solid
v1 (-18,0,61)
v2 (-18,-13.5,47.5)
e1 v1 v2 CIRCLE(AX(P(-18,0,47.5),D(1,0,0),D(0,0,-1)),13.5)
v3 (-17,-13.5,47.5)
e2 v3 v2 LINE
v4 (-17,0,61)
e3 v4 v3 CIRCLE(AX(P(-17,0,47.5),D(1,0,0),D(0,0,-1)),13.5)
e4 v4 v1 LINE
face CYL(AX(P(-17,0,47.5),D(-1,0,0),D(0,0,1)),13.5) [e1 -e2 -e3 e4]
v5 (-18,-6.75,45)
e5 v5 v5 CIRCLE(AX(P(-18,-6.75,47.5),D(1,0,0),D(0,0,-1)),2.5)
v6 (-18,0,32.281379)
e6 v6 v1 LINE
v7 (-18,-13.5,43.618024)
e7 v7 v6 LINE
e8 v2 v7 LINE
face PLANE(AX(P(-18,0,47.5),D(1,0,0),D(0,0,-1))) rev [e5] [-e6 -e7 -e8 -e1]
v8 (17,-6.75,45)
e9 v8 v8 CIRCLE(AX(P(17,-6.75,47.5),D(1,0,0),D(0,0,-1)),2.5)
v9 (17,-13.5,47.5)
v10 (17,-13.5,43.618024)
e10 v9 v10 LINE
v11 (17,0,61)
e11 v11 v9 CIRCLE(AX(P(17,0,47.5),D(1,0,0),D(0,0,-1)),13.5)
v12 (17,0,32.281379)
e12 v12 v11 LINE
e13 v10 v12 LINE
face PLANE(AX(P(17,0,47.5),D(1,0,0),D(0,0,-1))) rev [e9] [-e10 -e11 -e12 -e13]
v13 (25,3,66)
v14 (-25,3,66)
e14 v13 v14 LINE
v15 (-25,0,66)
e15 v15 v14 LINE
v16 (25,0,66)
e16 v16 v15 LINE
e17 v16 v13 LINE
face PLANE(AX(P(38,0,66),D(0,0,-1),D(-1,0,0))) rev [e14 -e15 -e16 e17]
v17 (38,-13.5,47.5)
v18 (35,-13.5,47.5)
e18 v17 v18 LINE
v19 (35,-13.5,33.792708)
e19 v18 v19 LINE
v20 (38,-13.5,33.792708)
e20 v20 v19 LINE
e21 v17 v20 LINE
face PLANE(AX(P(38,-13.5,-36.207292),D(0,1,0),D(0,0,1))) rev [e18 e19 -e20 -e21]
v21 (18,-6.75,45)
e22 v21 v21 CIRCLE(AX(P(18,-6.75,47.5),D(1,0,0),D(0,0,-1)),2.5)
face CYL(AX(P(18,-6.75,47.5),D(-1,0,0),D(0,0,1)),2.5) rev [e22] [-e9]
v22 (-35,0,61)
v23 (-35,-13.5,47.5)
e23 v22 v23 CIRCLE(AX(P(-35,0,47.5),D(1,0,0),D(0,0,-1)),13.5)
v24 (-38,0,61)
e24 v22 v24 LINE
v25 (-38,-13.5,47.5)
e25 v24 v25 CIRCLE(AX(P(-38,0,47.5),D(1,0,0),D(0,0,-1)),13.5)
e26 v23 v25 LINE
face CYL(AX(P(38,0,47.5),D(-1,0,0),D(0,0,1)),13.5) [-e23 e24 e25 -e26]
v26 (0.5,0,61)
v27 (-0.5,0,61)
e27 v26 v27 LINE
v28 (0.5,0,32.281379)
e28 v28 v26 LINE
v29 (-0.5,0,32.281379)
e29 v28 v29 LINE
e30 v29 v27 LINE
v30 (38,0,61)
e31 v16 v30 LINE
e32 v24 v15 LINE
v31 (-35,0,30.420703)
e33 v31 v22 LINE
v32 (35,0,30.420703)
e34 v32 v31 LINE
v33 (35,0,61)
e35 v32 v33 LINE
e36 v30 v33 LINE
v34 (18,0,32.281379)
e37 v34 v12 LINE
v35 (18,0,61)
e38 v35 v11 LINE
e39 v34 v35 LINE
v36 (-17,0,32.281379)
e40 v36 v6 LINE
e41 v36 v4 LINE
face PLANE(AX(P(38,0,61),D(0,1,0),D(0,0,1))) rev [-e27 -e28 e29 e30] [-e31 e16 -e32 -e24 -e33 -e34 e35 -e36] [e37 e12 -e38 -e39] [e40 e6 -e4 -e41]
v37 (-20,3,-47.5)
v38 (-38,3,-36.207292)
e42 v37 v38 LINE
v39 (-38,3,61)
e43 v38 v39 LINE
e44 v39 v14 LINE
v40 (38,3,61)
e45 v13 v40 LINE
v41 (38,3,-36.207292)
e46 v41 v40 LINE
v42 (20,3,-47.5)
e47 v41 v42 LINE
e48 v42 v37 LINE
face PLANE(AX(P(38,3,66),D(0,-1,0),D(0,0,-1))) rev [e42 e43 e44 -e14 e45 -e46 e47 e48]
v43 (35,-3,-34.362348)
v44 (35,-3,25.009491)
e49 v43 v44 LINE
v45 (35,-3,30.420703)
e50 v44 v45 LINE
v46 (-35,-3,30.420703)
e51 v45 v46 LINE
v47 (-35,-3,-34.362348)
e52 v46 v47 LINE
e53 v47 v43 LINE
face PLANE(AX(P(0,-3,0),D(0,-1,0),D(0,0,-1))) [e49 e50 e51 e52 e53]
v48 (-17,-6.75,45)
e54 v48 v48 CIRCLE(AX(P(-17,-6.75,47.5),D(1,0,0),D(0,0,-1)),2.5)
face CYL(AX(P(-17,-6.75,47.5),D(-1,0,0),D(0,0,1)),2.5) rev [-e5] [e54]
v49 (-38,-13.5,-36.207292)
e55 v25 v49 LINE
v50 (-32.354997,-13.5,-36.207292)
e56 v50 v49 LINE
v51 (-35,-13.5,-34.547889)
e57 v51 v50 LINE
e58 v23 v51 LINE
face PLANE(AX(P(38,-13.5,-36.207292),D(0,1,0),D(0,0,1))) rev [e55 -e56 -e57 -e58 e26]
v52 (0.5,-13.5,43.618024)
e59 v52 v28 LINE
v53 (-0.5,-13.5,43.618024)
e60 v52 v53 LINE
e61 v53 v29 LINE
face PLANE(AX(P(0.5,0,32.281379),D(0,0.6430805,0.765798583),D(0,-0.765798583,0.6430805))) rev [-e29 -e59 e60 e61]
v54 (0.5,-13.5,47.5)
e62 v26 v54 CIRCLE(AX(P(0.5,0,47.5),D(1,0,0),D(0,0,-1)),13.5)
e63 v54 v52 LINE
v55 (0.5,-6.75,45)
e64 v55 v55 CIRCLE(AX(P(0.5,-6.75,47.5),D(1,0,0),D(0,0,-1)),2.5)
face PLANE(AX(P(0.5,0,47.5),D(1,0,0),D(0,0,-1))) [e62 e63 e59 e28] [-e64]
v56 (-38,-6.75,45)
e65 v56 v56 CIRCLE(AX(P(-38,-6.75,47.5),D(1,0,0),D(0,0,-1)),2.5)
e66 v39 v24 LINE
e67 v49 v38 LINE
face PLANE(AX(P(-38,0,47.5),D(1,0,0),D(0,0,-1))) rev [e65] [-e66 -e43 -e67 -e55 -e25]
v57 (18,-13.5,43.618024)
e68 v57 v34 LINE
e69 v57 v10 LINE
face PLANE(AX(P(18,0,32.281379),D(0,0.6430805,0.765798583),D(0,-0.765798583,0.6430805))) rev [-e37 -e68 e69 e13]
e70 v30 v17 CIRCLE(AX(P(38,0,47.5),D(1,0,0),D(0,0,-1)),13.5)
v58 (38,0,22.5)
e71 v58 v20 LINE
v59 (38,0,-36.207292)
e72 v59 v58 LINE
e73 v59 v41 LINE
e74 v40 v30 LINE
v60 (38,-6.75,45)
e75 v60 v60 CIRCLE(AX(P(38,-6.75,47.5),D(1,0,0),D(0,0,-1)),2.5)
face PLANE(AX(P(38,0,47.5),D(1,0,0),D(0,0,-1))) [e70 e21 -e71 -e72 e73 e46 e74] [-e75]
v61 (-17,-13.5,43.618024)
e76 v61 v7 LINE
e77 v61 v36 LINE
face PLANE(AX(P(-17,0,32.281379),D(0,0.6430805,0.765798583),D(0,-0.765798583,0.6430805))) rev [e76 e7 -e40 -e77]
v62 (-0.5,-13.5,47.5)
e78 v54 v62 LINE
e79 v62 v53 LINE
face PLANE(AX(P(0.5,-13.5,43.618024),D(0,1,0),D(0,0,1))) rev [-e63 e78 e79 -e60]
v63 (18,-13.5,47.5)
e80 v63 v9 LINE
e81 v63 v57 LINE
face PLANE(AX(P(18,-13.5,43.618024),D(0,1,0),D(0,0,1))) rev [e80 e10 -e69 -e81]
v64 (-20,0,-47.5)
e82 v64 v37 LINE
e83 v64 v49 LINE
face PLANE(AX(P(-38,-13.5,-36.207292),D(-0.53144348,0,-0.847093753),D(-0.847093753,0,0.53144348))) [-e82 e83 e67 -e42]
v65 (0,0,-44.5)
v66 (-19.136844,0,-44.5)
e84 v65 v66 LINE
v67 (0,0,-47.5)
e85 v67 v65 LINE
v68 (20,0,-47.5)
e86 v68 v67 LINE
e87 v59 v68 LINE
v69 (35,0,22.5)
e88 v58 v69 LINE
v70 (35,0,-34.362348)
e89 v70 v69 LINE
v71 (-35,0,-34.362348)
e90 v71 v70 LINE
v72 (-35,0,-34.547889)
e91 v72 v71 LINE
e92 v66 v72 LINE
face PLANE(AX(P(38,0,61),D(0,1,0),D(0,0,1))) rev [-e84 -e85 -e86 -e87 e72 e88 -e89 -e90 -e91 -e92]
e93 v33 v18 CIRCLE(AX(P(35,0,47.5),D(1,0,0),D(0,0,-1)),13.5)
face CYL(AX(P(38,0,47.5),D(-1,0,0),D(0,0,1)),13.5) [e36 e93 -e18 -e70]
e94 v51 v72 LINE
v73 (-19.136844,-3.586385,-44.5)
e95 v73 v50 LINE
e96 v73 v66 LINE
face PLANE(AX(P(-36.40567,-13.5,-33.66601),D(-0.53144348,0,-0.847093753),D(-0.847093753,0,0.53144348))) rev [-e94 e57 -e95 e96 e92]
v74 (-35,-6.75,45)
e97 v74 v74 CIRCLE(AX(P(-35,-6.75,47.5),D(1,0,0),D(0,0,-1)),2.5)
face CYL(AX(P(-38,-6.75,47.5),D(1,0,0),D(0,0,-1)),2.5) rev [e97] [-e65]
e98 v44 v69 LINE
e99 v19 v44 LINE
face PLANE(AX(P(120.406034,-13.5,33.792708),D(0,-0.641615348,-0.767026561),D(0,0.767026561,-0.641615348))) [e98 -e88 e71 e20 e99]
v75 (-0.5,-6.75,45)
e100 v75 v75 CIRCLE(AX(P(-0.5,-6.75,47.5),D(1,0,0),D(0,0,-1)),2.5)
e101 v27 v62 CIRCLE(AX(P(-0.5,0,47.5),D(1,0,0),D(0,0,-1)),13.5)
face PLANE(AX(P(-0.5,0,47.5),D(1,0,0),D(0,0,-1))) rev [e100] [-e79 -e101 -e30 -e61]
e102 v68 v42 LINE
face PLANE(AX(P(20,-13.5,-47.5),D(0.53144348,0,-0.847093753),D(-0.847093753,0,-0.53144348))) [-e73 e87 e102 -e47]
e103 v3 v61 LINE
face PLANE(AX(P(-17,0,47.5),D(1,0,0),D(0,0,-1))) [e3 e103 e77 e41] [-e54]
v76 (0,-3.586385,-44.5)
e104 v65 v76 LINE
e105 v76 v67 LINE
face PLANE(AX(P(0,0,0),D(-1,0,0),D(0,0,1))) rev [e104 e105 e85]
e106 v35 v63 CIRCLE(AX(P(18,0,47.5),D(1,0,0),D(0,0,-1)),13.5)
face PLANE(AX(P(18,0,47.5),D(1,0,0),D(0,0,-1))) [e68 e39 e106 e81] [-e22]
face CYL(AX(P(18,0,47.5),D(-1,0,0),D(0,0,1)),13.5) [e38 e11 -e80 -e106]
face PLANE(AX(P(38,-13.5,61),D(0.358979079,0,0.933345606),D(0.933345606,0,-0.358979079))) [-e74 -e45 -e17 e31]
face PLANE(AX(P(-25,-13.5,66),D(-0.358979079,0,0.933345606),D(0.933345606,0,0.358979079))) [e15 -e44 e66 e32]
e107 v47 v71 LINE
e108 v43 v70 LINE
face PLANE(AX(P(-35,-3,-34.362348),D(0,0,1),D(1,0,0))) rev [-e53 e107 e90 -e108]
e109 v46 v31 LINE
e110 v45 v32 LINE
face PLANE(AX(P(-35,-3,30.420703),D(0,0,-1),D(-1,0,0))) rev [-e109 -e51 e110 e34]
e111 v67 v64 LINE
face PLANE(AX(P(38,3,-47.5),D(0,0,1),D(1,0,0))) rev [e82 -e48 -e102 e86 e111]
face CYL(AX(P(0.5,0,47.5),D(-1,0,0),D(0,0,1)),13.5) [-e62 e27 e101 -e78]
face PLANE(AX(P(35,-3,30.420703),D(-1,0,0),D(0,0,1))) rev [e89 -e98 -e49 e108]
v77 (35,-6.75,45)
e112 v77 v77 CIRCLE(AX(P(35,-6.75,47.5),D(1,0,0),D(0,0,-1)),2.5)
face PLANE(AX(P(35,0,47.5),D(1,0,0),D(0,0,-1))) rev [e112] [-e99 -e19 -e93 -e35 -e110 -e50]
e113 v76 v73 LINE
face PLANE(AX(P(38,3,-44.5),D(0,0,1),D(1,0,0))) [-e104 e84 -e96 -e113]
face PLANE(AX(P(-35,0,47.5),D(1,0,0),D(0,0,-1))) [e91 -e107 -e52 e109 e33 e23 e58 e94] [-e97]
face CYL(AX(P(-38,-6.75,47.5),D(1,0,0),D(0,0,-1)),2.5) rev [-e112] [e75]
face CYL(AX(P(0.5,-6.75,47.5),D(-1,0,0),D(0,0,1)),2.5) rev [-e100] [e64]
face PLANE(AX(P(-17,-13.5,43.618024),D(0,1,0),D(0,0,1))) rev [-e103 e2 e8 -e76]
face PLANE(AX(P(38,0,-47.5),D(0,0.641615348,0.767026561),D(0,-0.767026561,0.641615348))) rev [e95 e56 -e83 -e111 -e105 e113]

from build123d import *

# Parameters (mm, degrees)
BOSS_EXTRUDE1_DEPTH     = 38
CUT_EXTRUDE1_DEPTH      = 78.345006303
CUT_EXTRUDE1_DEPTH_BACK = 78.345006303
SKETCH2_OUTSIDE_W       = 105.518
SKETCH2_OUTSIDE_H       = 143.018
SHELL1_START            = -13.5
SHELL1_DEPTH            = 13.5
CUT_EXTRUDE2_DEPTH      = 78.345006303
CUT_EXTRUDE2_DEPTH_BACK = 78.345006303
SKETCH3_R               = 2.5
CUT_EXTRUDE3_DEPTH      = 38
SKETCH5_R               = 2.5
BOSS_EXTRUDE2_DEPTH     = 0.5
LPATTERN1_COUNT         = 3
LPATTERN1_PITCH         = 17.5
SKETCH7_W               = 70
SKETCH7_H               = 64.783051232
BOSS_EXTRUDE3_DEPTH     = 3


# Read off the part's stored shape, not the designer's step: Shell1
with BuildPart() as part:
    # Sketch1 → Boss-Extrude1 (new, symmetric)
    with BuildSketch(Plane(origin=(0, 0, 0), x_dir=(0, 0, -1), z_dir=(1, 0, 0))):
        with BuildLine():
            Line((-61, 0), (-66, 0))
            Line((-66, 0), (-66, 3))
            Line((-66, 3), (47.5, 3))
            Line((47.5, 3), (47.5, 0))
            Line((47.5, 0), (36.207291717, -13.5))
            Line((36.207291717, -13.5), (-47.5, -13.5))
            ThreePointArc((-47.5, -13.5), (-57.045941546, -9.545941546), (-61, 0))
        make_face()
    extrude(amount=BOSS_EXTRUDE1_DEPTH, both=True)

    # Sketch2 outside → Cut-Extrude1 (cut, two sides: drawn at the far end of the back side and taken through both)
    with BuildSketch(Plane(origin=(0, 0, 0), x_dir=(1, 0, 0), z_dir=(0, 1, 0)).offset(-CUT_EXTRUDE1_DEPTH_BACK)):
        with Locations((0, -9.25)):
            Rectangle(SKETCH2_OUTSIDE_W, SKETCH2_OUTSIDE_H)
        Polygon((-25, -66), (-38, -61), (-38, 36.207291717), (-20, 47.5), (20, 47.5), (38, 36.207291717), (38, -61), (25, -66), align=None, mode=Mode.SUBTRACT)
    extrude(amount=CUT_EXTRUDE1_DEPTH + CUT_EXTRUDE1_DEPTH_BACK, mode=Mode.SUBTRACT)

    # Shell1 outline → Shell1 (cut)
    with BuildSketch(Plane(origin=(0, 0, 0), x_dir=(1, 0, 0), z_dir=(0, 1, 0)).offset(SHELL1_START)):
        Polygon((19.136843791, 44.5), (-19.136843791, 44.5), (-35, 34.547889139), (-35, -68), (35, -68), (35, 34.547889139), align=None)
    extrude(amount=SHELL1_DEPTH, mode=Mode.SUBTRACT)

    # Sketch3 → Cut-Extrude2 (cut, two sides: drawn at the far end of the back side and taken through both)
    with BuildSketch(Plane(origin=(0, 0, 0), x_dir=(0, 0, -1), z_dir=(1, 0, 0)).offset(-CUT_EXTRUDE2_DEPTH_BACK)):
        with Locations((-47.5, -6.75)):
            Circle(SKETCH3_R)
    extrude(amount=CUT_EXTRUDE2_DEPTH + CUT_EXTRUDE2_DEPTH_BACK, mode=Mode.SUBTRACT)

    # Sketch4 → Cut-Extrude3 (cut)
    with BuildSketch(Plane(origin=(0, 0, 0), x_dir=(0, 0, -1), z_dir=(1, 0, 0))):
        Polygon((-22.5, 0), (47.5, 0), (36.207291717, -13.5), (-33.792708283, -13.5), align=None)
    extrude(amount=CUT_EXTRUDE3_DEPTH, mode=Mode.SUBTRACT)

    # Sketch5 → Boss-Extrude2 (add, symmetric)
    with BuildSketch(Plane(origin=(17.5, 0, 0), x_dir=(0, 0, -1), z_dir=(1, 0, 0))):
        with BuildLine():
            Line((-61, 0), (-32.281378795, 0))
            Line((-32.281378795, 0), (-43.618023888, -13.5))
            Line((-43.618023888, -13.5), (-47.5, -13.5))
            ThreePointArc((-47.5, -13.5), (-57.045941546, -9.545941546), (-61, 0))
        make_face()
        with Locations((-47.5, -6.75)):
            Circle(SKETCH5_R, mode=Mode.SUBTRACT)
    boss_extrude2 = extrude(amount=BOSS_EXTRUDE2_DEPTH, both=True)

    # LPattern1: Boss-Extrude2 ×3
    with Locations(*[(-i * LPATTERN1_PITCH, 0, 0) for i in range(1, LPATTERN1_COUNT)]):
        add(boss_extrude2)

    # Sketch7 → Boss-Extrude3 (add)
    with BuildSketch(Plane.XZ):
        with Locations((0, -1.970822706)):
            Rectangle(SKETCH7_W, SKETCH7_H)
    extrude(amount=BOSS_EXTRUDE3_DEPTH)


solid = part.part
